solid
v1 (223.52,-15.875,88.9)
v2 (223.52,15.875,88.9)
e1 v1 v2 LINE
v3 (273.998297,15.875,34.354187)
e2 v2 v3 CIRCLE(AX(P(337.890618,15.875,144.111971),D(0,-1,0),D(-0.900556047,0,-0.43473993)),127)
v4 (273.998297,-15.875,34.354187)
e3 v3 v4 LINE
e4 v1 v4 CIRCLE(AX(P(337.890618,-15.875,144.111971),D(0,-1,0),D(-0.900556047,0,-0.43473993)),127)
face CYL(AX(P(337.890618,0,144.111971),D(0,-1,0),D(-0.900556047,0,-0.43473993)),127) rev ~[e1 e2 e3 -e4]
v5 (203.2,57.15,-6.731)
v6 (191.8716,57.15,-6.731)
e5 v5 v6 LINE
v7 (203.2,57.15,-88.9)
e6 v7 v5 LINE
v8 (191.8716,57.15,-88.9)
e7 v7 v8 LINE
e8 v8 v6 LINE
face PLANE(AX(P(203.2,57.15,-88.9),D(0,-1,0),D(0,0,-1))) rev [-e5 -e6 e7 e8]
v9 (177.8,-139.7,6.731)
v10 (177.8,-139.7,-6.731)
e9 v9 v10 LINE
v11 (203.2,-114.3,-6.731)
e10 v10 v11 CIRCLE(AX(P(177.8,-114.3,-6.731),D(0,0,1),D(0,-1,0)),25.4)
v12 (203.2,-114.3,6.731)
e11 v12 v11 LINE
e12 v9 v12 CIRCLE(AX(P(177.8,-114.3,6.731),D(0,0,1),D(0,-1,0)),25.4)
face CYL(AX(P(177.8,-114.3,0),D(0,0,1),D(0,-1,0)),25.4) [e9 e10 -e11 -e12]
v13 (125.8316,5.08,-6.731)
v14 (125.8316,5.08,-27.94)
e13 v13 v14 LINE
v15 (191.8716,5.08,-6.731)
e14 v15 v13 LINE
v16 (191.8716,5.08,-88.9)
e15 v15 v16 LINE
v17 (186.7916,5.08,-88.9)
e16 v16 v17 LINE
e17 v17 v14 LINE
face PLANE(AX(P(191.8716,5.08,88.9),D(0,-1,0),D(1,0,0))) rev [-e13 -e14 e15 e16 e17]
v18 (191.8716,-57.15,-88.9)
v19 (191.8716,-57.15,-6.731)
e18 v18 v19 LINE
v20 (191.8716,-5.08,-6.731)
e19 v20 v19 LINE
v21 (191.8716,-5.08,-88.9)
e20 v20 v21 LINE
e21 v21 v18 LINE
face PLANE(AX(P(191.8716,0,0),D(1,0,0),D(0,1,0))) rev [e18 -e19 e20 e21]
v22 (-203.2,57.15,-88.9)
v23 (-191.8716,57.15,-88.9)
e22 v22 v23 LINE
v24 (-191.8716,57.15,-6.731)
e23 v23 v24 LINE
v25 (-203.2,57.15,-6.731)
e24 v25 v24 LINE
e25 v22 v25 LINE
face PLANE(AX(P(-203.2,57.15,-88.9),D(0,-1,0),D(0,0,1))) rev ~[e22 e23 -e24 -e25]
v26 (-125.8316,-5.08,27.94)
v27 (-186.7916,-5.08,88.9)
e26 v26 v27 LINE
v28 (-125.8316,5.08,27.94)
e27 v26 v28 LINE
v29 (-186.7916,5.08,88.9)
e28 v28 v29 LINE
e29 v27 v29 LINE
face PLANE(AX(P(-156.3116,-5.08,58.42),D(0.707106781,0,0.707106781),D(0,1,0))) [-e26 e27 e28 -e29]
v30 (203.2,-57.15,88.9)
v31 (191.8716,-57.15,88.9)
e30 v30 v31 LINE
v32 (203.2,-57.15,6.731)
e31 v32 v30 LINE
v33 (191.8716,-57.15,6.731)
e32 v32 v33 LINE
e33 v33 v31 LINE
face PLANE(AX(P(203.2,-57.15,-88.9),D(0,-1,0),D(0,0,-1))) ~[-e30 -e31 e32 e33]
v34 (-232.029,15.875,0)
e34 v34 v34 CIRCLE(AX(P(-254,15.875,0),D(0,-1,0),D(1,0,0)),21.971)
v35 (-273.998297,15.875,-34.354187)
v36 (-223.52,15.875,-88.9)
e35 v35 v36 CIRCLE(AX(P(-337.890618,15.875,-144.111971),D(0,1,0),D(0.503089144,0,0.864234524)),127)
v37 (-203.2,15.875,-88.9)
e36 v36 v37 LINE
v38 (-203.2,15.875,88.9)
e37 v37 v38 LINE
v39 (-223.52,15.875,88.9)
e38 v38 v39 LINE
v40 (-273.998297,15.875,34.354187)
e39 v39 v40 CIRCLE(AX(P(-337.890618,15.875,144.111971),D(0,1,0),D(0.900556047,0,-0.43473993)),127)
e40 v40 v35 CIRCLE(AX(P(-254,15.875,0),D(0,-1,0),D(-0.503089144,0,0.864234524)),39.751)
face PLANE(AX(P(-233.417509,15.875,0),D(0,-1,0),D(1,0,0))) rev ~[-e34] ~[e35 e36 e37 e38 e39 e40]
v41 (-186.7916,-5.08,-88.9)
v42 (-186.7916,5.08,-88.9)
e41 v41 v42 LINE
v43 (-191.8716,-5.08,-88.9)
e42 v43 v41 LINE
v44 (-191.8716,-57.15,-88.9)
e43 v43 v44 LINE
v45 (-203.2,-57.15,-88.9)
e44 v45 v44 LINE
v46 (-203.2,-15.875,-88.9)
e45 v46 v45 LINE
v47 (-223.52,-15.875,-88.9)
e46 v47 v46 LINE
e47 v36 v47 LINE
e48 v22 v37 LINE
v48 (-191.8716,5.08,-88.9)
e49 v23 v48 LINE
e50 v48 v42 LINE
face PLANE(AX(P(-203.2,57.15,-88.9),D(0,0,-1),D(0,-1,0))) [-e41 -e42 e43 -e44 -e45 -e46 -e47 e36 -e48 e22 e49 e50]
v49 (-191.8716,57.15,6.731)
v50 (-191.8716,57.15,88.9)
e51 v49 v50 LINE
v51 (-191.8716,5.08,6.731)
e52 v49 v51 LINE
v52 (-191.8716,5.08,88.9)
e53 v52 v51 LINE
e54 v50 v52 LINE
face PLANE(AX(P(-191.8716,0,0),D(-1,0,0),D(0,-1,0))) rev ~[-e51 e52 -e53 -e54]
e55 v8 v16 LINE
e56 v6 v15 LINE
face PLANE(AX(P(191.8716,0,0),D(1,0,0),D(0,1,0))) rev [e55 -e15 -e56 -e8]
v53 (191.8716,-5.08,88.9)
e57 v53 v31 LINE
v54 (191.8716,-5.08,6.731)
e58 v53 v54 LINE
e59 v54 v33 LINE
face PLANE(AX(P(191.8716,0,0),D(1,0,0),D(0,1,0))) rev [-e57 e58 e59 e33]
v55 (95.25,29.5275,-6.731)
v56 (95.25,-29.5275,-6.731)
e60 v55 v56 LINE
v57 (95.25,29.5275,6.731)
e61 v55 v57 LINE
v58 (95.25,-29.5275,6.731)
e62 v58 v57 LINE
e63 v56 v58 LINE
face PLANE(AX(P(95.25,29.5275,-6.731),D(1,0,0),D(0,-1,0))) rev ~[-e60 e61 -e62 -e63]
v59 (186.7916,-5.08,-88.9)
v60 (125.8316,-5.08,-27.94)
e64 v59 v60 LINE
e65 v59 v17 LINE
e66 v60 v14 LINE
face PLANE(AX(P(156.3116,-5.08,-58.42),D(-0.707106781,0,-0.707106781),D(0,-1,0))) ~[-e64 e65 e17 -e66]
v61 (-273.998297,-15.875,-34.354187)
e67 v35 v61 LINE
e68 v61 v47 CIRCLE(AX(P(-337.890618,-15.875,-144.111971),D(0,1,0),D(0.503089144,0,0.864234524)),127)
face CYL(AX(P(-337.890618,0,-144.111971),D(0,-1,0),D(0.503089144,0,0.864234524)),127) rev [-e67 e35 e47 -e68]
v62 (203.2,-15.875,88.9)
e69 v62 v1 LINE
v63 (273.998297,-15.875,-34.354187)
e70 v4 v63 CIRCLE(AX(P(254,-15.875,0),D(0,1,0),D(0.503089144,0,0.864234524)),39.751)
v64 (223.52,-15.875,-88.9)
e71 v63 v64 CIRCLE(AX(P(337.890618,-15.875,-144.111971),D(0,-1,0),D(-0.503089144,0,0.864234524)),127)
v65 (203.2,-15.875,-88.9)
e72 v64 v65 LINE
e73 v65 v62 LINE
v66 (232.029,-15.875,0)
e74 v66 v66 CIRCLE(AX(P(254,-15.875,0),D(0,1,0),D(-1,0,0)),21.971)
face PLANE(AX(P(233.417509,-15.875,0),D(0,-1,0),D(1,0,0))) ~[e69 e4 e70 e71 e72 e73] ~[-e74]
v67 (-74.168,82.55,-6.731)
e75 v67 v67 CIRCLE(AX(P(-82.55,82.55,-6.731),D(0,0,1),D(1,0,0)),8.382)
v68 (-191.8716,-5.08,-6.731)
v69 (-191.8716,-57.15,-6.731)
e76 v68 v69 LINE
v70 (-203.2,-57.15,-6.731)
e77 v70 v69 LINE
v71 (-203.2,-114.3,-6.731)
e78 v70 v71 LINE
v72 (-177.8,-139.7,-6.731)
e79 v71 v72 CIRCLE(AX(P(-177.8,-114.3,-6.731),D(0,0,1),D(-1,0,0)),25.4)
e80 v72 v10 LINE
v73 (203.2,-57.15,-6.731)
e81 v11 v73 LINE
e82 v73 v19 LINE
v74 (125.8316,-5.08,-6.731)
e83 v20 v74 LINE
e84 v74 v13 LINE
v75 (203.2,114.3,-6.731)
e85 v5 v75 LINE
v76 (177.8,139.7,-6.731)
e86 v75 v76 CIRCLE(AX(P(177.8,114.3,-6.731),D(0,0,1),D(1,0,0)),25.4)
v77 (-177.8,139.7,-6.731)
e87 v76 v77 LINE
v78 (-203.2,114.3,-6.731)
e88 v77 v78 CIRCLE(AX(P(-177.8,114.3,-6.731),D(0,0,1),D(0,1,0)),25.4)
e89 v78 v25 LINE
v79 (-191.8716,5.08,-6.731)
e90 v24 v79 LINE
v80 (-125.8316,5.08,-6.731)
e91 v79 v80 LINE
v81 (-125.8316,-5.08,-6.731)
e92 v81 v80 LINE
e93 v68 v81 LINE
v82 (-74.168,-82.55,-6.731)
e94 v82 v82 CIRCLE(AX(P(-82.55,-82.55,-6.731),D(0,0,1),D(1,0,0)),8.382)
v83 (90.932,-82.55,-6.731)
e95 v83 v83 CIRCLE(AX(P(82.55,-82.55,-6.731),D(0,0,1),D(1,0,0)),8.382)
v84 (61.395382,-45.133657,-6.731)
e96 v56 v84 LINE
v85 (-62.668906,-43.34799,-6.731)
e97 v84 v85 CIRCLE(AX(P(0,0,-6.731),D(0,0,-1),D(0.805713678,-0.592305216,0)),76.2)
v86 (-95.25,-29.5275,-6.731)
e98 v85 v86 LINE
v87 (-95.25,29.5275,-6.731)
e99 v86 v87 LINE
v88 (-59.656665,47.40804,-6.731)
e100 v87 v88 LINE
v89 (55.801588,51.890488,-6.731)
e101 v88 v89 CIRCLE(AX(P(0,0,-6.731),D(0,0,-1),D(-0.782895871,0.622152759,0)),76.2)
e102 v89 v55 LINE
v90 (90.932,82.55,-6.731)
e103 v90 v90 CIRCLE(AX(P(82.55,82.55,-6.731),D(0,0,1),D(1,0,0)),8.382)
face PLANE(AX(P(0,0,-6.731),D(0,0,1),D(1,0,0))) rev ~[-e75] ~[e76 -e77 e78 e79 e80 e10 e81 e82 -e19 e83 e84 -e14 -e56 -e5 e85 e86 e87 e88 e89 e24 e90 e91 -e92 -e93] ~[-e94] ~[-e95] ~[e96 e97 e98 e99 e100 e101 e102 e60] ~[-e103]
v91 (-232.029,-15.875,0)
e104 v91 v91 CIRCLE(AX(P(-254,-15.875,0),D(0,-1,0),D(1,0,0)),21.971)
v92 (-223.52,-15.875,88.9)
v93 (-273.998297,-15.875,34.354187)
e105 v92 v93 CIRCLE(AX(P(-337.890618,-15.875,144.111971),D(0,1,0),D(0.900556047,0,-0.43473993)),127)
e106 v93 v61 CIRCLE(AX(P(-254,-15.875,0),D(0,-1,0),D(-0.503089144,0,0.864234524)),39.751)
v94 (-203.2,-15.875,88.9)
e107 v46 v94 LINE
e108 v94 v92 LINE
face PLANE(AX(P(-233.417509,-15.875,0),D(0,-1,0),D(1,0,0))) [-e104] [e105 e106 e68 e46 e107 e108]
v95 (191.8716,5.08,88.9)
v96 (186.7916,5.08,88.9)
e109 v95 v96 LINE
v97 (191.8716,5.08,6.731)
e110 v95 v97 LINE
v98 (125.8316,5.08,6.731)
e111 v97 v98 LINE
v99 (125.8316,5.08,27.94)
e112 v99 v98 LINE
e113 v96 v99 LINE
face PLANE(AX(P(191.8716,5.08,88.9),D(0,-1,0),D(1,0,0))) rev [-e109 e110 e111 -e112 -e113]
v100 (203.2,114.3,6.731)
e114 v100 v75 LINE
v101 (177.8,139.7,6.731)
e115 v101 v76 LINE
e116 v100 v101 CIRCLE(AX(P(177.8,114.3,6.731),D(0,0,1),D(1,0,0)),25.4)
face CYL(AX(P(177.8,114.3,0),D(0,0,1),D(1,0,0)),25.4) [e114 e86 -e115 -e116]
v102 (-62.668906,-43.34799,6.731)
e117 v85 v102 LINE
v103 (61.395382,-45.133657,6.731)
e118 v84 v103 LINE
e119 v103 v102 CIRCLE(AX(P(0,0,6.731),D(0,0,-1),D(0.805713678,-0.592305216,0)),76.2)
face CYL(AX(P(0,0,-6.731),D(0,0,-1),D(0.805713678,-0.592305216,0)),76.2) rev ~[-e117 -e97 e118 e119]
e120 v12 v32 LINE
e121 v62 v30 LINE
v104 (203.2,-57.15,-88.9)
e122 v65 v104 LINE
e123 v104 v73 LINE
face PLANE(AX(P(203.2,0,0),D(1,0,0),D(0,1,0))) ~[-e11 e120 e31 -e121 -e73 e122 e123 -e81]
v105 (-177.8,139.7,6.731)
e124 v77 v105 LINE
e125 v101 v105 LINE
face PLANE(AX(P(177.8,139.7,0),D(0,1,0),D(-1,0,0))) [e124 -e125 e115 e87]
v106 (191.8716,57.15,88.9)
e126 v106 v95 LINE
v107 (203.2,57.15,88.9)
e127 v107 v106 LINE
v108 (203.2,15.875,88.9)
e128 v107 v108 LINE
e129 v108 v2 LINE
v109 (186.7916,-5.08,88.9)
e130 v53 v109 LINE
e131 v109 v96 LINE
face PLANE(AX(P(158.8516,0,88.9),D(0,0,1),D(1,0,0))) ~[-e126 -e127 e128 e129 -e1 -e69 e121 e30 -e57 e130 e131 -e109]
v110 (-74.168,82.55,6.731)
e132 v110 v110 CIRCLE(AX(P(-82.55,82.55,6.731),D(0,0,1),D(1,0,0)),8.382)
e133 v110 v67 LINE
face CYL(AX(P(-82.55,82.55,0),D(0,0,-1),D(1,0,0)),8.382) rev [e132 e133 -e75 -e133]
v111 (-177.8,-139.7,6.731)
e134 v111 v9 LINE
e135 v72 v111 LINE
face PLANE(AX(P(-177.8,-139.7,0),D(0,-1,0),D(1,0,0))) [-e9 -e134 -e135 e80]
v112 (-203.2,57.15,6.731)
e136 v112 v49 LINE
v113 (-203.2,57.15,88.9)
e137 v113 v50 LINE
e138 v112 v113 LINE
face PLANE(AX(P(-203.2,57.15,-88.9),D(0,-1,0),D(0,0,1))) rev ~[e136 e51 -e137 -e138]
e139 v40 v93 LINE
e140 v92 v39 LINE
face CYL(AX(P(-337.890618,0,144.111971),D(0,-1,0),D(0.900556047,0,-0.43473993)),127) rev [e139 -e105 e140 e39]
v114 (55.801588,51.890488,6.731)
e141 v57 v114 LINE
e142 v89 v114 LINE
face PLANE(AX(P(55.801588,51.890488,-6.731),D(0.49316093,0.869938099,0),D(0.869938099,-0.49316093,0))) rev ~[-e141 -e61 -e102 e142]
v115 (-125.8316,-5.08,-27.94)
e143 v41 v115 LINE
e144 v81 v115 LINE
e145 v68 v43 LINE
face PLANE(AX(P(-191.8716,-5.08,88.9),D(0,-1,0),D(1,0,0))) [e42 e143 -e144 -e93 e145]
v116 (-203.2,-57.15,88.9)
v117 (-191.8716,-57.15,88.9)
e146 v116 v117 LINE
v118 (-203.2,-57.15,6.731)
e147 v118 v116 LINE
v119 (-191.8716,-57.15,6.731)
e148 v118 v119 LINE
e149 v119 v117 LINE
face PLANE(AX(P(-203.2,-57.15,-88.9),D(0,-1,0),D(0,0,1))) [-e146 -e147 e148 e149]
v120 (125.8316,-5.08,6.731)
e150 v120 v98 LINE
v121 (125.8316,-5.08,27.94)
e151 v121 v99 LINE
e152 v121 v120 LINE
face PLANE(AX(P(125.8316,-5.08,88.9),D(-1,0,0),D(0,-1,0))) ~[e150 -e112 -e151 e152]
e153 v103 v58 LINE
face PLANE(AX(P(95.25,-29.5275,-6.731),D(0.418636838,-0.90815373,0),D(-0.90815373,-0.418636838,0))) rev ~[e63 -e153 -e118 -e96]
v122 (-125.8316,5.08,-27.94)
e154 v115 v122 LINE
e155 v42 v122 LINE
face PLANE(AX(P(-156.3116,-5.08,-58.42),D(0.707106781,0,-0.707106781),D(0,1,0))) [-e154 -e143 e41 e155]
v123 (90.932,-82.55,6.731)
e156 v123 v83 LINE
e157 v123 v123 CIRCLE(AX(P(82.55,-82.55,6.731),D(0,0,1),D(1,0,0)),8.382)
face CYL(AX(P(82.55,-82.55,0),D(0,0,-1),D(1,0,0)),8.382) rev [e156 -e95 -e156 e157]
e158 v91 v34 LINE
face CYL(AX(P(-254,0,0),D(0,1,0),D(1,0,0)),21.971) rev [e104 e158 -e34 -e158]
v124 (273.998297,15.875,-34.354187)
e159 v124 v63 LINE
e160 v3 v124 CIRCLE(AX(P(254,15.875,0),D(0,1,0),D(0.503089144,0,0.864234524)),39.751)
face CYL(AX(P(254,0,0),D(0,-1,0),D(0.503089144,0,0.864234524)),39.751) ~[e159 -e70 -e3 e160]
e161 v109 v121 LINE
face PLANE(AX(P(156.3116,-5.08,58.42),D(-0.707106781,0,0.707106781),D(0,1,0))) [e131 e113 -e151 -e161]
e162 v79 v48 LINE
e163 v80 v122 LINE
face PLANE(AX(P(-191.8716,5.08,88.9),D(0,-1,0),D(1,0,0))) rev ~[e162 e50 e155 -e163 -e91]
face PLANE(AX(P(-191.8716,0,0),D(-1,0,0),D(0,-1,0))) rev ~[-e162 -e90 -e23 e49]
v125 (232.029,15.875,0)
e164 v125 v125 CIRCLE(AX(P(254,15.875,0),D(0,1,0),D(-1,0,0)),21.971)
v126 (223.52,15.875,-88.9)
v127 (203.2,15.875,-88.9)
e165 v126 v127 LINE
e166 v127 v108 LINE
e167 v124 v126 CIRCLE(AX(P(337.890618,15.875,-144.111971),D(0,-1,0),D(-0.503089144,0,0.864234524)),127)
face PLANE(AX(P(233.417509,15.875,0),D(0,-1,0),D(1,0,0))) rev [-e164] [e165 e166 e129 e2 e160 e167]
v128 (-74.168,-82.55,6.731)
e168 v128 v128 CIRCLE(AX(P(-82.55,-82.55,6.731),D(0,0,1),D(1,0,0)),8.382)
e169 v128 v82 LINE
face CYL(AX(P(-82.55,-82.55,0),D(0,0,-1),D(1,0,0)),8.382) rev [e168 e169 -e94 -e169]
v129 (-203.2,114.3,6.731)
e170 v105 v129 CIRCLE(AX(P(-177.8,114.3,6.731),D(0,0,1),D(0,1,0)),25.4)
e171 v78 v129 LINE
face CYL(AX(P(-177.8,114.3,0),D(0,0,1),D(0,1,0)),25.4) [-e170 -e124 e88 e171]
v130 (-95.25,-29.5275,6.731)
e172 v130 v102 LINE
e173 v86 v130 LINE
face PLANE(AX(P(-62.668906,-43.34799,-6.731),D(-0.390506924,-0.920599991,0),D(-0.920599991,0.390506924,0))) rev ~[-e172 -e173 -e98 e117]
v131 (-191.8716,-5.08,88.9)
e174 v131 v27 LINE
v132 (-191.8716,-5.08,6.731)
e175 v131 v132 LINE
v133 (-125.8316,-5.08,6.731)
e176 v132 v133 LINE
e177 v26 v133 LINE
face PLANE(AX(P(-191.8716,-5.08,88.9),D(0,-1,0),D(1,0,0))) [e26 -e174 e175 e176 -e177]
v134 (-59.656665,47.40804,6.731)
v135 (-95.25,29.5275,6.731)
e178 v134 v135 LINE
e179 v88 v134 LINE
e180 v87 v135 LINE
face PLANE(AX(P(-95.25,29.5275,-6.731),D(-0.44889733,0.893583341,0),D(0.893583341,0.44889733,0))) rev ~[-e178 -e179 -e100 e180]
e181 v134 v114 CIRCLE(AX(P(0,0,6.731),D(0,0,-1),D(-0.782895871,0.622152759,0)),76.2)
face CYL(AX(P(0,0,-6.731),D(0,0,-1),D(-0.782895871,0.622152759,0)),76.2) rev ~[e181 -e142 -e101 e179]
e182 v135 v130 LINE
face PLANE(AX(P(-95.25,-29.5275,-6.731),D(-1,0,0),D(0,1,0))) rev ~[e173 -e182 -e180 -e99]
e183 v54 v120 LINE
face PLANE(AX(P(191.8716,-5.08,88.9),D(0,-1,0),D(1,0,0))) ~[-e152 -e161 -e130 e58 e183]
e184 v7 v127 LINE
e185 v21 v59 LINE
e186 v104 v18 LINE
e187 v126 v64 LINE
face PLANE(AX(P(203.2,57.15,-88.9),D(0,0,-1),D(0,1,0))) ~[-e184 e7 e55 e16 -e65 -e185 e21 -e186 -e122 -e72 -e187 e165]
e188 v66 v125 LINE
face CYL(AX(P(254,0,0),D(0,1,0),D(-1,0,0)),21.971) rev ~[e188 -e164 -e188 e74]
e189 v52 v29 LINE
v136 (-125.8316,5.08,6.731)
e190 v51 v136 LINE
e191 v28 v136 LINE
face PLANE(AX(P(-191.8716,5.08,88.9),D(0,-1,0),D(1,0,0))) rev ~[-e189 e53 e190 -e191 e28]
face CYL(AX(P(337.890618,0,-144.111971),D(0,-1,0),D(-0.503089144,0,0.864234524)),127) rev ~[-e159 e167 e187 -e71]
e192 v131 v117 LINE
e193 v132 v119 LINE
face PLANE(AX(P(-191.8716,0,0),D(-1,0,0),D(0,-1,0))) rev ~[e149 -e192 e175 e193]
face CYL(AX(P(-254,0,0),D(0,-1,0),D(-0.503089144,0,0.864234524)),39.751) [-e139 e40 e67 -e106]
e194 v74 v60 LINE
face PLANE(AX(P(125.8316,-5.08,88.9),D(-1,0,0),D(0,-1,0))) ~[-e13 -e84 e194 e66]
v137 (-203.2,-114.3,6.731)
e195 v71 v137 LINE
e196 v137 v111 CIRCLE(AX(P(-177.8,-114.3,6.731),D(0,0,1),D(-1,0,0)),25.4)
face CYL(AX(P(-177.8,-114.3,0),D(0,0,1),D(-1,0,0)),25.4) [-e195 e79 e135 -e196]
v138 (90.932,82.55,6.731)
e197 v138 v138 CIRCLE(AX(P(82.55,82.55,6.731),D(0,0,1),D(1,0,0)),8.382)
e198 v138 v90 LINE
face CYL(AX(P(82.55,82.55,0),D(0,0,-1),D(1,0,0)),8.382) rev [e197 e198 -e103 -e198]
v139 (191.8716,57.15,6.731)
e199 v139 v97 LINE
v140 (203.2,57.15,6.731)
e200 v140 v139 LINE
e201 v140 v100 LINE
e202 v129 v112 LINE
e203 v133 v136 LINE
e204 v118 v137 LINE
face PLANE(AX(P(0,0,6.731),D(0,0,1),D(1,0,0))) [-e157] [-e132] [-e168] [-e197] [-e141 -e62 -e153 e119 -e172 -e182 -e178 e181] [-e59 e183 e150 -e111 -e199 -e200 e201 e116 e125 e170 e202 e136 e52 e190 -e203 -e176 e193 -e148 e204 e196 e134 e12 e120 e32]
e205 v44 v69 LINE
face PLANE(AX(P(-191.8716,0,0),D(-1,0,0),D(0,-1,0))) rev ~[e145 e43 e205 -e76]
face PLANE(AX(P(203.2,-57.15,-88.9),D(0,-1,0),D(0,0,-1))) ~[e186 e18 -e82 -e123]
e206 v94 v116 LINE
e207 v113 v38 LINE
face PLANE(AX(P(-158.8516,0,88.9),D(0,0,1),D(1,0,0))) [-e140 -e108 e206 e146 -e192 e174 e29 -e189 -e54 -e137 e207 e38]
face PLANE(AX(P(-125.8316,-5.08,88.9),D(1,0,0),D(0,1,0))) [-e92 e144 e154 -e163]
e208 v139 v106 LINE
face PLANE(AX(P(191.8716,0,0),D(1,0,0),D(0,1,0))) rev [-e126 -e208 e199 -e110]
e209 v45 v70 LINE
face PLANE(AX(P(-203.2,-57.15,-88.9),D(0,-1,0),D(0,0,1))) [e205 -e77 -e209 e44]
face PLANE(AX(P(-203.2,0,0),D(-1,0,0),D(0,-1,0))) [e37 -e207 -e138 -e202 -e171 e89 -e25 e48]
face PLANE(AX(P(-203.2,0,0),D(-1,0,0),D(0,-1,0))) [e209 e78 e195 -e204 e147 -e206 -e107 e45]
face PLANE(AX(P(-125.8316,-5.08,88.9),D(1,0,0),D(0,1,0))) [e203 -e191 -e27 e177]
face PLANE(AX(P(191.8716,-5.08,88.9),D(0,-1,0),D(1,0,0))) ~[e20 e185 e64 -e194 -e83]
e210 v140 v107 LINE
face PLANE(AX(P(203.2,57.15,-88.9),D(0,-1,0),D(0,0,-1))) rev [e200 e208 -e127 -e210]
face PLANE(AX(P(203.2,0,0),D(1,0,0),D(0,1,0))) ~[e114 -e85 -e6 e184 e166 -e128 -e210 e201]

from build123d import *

# Parameters (mm, degrees)
F0_R      = 8.382
F1_DEPTH  = 6.731
F2_W      = 114.3
F2_H      = 177.8
F3_DEPTH  = 11.3284
F4_R      = 21.971
F5_DEPTH  = 15.875
F6_W      = 66.04
F6_H      = 10.16
F7_DEPTH  = 177.8
F8_SIZE   = 60.96
F10_DEPTH = 95.632


# Not quite as in the source:
# - a pattern or mirror of a feature is missing from the dataset's text; its kind, count and spacing are read off the source's solid


with BuildPart() as f1:
    # F0 (on Top) → F1 (new body, symmetric)
    with BuildSketch(Plane.XY):
        with BuildLine():
            Line((177.8, 139.7), (-177.8, 139.7))
            ThreePointArc((-177.8, 139.7), (-195.7605122421, 132.2605122421), (-203.2, 114.3))
            Line((-203.2, 114.3), (-203.2, -114.3))
            ThreePointArc((-203.2, -114.3), (-195.7605122421, -132.2605122421), (-177.8, -139.7))
            Line((-177.8, -139.7), (177.8, -139.7))
            ThreePointArc((177.8, -139.7), (195.7605122421, -132.2605122421), (203.2, -114.3))
            Line((203.2, -114.3), (203.2, 114.3))
            ThreePointArc((203.2, 114.3), (195.7605122421, 132.2605122421), (177.8, 139.7))
        make_face()
        with Locations((-82.55, -82.55)):
            Circle(F0_R, mode=Mode.SUBTRACT)
        with Locations((82.55, -82.55)):
            Circle(F0_R, mode=Mode.SUBTRACT)
        with Locations((-82.55, 82.55)):
            Circle(F0_R, mode=Mode.SUBTRACT)
        with Locations((82.55, 82.55)):
            Circle(F0_R, mode=Mode.SUBTRACT)
    extrude(amount=F1_DEPTH, both=True)

    # F2 (on face) → F3 (join)
    with BuildSketch(Plane(origin=(-203.2, 0, 0), x_dir=(0, -1, 0), z_dir=(-1, 0, 0))):
        Rectangle(F2_W, F2_H)
    f3 = extrude(amount=-F3_DEPTH)

    # F3_copies: F3 across plane
    add(f3.mirror(Plane(origin=(0, 0, 0), x_dir=(0, 0, 1), z_dir=(1, 0, 0))))

    # F4 (on Front) → F5 (join, symmetric)
    with BuildSketch(Plane.XZ):
        with BuildLine():
            ThreePointArc((-223.52, 88.9), (-244.6799408534, 57.8520750061), (-273.9982965787, 34.354186571))
            ThreePointArc((-273.9982965787, 34.354186571), (-293.751, 0), (-273.9982965787, -34.354186571))
            ThreePointArc((-273.9982965787, -34.354186571), (-244.6799408534, -57.8520750061), (-223.52, -88.9))
            Line((-223.52, -88.9), (-203.2, -88.9))
            Line((-203.2, -88.9), (-203.2, -6.731))
            Line((-203.2, -6.731), (-203.2, 6.731))
            Line((-203.2, 6.731), (-203.2, 88.9))
            Line((-203.2, 88.9), (-223.52, 88.9))
        make_face()
        with Locations((-254, 0)):
            Circle(F4_R, mode=Mode.SUBTRACT)
    f5 = extrude(amount=F5_DEPTH, both=True)

    # F5_copies: F5 across plane
    add(f5.mirror(Plane(origin=(0, 0, 0), x_dir=(0, 0, 1), z_dir=(1, 0, 0))))

    # F6 (on face) → F7 (join, through all)
    with BuildSketch(Plane.XY.offset(88.9)):
        with Locations((-158.8516, 0)):
            Rectangle(F6_W, F6_H)
    f7 = extrude(amount=-F7_DEPTH)

    # F7_copies: F7 across plane
    add(f7.mirror(Plane(origin=(0, 0, 0), x_dir=(0, 0, 1), z_dir=(1, 0, 0))))

    # F8
    f8_edges = [f1.edges().sort_by_distance(p)[0] for p in [
        (-125.8316, 0, -88.9),
        (-125.8316, 0, 88.9),
        (125.8316, 0, -88.9),
        (125.8316, 0, 88.9),
    ]]
    chamfer(f8_edges, length=F8_SIZE)

    # F9 (on face) → F10 (cut, through all)
    with BuildSketch(Plane(origin=(0, 0, -6.731), x_dir=(1, 0, 0), z_dir=(0, 0, -1))):
        with BuildLine():
            Line((-95.25, -29.5275), (-59.6566653523, -47.4080402362))
            ThreePointArc((-59.6566653523, -47.4080402362), (-2.9560938308, -76.1426392323), (55.8015879509, -51.8904883592))
            Line((55.8015879509, -51.8904883592), (95.25, -29.5275))
            Line((95.25, -29.5275), (95.25, 29.5275))
            Line((95.25, 29.5275), (61.3953822556, 45.1336574818))
            ThreePointArc((61.3953822556, 45.1336574818), (-1.0966393905, 76.1921083974), (-62.6689060075, 43.3479898015))
            Line((-62.6689060075, 43.3479898015), (-95.25, 29.5275))
            Line((-95.25, 29.5275), (-95.25, -29.5275))
        make_face()
    extrude(amount=-F10_DEPTH, mode=Mode.SUBTRACT)


solid = f1.part
